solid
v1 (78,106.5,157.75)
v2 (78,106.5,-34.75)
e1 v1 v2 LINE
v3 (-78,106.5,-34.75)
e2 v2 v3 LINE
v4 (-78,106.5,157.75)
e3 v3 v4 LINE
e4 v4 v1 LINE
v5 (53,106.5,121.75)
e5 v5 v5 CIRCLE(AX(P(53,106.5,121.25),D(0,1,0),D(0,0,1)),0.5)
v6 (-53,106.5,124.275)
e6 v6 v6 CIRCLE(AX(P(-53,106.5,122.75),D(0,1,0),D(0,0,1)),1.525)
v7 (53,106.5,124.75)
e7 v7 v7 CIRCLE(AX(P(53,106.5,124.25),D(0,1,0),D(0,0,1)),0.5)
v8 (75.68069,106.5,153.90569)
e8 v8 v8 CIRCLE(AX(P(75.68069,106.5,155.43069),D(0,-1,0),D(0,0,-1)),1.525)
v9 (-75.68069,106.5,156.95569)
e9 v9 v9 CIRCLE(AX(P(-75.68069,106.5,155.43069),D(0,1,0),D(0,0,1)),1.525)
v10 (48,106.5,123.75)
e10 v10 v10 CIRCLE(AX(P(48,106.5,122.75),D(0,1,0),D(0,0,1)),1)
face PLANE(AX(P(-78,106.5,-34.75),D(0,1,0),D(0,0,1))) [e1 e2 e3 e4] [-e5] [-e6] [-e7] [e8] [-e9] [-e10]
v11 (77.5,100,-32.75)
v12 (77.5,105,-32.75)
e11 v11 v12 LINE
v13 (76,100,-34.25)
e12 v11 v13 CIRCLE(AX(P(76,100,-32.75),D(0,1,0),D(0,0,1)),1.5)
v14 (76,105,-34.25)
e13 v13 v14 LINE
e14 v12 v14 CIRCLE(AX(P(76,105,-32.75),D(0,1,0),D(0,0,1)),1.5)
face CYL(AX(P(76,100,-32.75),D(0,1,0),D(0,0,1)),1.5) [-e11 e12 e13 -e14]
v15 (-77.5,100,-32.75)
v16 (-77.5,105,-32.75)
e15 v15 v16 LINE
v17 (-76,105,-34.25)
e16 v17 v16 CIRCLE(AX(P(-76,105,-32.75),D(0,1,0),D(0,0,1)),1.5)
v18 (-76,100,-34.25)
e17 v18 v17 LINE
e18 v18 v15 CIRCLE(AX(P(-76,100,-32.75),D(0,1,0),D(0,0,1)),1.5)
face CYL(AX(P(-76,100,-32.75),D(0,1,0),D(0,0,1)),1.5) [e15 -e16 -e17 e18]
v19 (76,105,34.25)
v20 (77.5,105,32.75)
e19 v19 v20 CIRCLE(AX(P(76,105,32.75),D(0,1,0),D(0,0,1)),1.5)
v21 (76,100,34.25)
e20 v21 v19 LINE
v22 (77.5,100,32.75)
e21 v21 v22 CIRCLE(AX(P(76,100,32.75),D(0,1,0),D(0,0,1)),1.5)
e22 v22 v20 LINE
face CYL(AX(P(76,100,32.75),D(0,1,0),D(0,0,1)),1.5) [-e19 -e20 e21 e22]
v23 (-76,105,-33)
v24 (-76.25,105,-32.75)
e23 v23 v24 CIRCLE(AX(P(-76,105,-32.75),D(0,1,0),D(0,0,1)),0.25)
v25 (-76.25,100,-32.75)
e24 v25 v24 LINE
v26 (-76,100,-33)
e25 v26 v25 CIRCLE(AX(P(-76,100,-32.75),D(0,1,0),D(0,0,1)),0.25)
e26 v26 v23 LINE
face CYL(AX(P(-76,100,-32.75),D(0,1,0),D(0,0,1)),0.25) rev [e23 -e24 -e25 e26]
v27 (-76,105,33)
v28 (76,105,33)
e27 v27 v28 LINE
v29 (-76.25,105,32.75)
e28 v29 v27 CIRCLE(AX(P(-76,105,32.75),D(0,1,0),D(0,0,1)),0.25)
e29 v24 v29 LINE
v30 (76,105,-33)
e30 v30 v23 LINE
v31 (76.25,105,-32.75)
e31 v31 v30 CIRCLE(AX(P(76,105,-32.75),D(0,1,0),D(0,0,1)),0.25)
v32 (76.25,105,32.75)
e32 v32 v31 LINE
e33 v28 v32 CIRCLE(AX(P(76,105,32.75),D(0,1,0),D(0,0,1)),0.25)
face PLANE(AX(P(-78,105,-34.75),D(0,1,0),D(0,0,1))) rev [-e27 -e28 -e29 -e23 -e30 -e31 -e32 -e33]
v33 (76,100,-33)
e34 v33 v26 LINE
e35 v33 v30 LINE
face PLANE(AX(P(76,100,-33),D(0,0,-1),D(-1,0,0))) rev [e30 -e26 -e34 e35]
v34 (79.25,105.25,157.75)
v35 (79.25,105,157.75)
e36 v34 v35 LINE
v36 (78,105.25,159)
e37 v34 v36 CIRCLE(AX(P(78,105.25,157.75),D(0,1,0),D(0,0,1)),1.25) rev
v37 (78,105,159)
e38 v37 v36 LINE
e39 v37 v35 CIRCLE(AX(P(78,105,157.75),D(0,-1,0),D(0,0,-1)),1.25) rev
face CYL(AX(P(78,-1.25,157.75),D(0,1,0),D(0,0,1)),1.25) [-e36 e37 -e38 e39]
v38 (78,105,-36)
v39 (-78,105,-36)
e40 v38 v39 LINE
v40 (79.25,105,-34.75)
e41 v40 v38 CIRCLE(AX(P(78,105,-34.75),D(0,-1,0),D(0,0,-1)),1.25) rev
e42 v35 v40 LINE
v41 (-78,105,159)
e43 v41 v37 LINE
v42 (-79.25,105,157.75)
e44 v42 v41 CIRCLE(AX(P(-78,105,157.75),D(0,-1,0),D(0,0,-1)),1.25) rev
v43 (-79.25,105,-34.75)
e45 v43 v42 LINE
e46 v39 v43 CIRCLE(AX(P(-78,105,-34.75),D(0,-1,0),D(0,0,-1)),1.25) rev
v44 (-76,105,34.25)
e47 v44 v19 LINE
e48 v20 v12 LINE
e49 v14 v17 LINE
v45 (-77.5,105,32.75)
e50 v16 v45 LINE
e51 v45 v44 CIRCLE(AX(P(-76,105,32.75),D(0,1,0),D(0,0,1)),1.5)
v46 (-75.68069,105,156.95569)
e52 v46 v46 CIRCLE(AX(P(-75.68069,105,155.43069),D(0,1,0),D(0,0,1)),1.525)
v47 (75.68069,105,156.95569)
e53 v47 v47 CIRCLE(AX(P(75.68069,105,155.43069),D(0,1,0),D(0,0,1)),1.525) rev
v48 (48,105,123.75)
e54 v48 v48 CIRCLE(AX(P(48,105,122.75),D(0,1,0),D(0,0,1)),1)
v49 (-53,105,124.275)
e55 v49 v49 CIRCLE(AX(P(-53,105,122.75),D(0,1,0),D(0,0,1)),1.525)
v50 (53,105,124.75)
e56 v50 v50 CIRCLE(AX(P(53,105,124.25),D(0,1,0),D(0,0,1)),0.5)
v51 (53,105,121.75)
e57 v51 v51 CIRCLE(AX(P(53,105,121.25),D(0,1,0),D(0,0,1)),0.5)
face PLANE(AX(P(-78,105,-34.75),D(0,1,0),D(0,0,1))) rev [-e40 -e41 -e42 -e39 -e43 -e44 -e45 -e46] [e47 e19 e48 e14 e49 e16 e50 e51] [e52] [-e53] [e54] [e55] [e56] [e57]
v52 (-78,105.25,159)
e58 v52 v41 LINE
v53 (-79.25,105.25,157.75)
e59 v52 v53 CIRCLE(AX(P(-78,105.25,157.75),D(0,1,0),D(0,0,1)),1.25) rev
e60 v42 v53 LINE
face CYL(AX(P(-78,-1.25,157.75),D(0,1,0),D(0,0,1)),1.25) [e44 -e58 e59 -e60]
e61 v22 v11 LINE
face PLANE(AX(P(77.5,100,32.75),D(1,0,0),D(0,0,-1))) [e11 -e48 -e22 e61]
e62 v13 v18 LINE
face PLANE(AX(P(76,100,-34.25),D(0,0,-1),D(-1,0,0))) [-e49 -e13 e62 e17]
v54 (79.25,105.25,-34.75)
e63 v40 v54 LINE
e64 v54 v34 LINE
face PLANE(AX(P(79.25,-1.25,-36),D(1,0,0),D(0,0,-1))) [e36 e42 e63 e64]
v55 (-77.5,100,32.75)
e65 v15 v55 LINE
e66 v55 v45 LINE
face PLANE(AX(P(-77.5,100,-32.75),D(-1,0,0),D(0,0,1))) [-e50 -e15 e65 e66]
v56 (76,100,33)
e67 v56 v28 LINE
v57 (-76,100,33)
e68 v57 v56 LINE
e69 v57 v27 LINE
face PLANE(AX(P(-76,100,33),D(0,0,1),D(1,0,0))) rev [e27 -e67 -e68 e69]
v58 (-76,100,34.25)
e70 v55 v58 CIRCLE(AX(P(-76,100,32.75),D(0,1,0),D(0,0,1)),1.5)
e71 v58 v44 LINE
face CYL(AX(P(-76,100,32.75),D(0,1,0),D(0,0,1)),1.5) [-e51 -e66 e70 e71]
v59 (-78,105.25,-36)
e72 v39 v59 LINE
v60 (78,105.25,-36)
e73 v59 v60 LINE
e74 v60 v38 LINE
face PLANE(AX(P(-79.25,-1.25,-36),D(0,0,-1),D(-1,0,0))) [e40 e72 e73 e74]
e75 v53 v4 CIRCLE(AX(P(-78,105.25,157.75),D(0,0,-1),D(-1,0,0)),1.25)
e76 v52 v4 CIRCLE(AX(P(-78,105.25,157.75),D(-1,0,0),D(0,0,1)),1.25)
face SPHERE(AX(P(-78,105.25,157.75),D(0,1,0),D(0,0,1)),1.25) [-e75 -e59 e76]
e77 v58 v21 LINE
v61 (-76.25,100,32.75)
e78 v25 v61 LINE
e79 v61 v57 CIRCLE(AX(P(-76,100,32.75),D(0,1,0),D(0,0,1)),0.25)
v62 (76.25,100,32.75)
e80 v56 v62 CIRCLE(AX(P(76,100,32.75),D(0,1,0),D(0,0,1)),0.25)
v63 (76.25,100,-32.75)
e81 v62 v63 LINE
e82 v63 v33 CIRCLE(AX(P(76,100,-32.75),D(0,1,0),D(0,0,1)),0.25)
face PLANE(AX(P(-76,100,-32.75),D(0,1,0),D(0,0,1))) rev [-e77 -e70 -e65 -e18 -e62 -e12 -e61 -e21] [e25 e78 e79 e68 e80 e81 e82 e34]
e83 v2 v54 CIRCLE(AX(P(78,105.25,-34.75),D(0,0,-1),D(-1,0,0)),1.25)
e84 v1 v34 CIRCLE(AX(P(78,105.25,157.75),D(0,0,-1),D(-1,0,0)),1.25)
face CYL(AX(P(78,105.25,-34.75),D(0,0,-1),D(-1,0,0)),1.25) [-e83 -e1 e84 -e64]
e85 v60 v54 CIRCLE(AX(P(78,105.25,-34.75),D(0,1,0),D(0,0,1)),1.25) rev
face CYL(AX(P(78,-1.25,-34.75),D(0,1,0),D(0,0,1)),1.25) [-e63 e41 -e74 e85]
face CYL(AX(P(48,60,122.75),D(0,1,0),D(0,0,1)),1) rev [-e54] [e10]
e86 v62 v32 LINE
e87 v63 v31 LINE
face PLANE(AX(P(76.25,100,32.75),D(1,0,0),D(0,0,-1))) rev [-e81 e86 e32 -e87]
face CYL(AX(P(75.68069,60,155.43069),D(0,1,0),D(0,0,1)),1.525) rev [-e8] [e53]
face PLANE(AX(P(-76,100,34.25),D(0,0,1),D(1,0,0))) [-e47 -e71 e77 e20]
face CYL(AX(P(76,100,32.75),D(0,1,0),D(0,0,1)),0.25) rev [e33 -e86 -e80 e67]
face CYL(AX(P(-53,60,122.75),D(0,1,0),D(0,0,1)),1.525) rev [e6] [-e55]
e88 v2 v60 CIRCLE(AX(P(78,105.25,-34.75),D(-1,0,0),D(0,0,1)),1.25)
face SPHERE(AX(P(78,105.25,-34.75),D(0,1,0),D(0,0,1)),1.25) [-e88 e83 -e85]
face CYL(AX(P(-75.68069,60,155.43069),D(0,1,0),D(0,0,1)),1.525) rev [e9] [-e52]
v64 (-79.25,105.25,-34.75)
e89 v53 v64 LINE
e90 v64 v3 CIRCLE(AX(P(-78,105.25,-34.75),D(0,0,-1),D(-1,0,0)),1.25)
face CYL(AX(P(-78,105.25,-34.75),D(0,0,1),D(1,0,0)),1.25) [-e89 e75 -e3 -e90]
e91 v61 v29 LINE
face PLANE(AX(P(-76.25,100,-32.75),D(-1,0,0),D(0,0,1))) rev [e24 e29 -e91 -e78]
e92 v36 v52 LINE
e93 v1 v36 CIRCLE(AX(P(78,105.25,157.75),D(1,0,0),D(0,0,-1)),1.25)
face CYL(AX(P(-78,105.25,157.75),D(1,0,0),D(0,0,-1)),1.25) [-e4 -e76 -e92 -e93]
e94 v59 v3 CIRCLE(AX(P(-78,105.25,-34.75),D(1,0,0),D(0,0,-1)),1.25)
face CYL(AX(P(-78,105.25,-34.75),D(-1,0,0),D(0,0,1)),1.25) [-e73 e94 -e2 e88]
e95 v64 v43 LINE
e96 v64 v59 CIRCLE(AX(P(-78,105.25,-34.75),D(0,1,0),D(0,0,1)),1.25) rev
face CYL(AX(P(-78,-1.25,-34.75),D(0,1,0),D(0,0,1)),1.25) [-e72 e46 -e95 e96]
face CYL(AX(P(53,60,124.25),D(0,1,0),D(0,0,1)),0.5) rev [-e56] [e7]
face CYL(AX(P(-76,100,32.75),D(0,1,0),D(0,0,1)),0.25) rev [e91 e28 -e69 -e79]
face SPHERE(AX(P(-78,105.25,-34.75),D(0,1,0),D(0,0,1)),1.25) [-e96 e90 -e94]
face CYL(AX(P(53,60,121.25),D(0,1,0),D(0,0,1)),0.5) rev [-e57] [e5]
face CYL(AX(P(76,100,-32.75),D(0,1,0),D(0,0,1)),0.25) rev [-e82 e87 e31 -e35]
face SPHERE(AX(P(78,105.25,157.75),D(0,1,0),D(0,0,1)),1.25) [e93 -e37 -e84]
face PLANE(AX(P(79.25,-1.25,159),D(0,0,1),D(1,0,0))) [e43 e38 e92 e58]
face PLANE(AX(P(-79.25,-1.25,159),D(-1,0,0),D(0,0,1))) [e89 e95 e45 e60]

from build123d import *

# Parameters (mm, degrees)
BOSS_EXTRUDE1_DEPTH      = 1.25
SKETCH1_W                = 156
SKETCH1_H                = 69.5
BOSS_EXTRUDE2_DEPTH      = 105
SKETCH4_R                = 2.5000000000000027
BOSS_EXTRUDE3_DEPTH      = 8
FILLET2_R                = 2
SKETCH5_R                = 1.5499999999999998
SKETCH5_R_2              = 1.5500000000000012
CUT_EXTRUDE1_DEPTH       = 8
SKETCH6_R                = 8.25
CUT_EXTRUDE2_DEPTH       = 8
SKETCH8_R                = 3.750000000000007
SKETCH8_R_2              = 3.0000000000000084
SKETCH8_W                = 7.000000000000014
SKETCH8_H                = 14
CUT_EXTRUDE3_DEPTH       = 8
FILLET3_R                = 1.25
FILLET4_R                = 1.25
SKETCH11_R               = 1.5499999999999932
CUT_EXTRUDE4_DEPTH       = 8
BOSS_EXTRUDE5_REACH      = 209.004
FILLET5_R                = 1.25
SKETCH14_R               = 1.5249999999999995
CUT_EXTRUDE5_DEPTH       = 8
BOSS_EXTRUDE6_DEPTH      = 5
CUT_EXTRUDE10_DEPTH      = 176.50000000000017
CUT_EXTRUDE10_DEPTH_BACK = 9
SKETCH19_R               = 1.5249999999999995
BOSS_EXTRUDE7_DEPTH      = 1.5
SKETCH17_W               = 214.39373035957487
SKETCH17_H               = 311.75060194691184
CUT_EXTRUDE6_DEPTH       = 142.50000000000003
SKETCH18_W               = 843.8612520819788
SKETCH18_H               = 210.19069540658822
CUT_EXTRUDE7_DEPTH       = 211.50000000000009
FILLET6_R                = 1.25
SKETCH21_R               = 1.5249999999999995
CUT_EXTRUDE11_DEPTH      = 46.50000000000004
SKETCH22_R               = 1.5249999999999952
SKETCH22_R_2             = 0.49999999999999917
SKETCH22_R_3             = 0.9999999999999983
CUT_EXTRUDE12_DEPTH      = 46.50000000000004


with BuildPart() as part:
    # Sketch2 → Boss-Extrude1 (new body)
    with BuildSketch(Plane(origin=(0, 0, 0), x_dir=(1, 0, 0), z_dir=(0, 1, 0))):
        Polygon((-79.25000000000004, 35.99999999999998), (79.24999999999996, 35.99999999999999), (79.24999999999999, -159.00000000000003), (-79.25000000000001, -159.00000000000003), align=None)
    extrude(amount=-BOSS_EXTRUDE1_DEPTH)

    # Sketch1 → Boss-Extrude2 (add)
    with BuildSketch(Plane(origin=(0, 0, 0), x_dir=(1, 0, 0), z_dir=(0, 1, 0))):
        Polygon((79.24999999999999, -159.00000000000003), (-79.25000000000001, -159.00000000000003), (-79.25000000000004, -86.00000000000001), (-79.25000000000004, -36.00000000000002), (-79.25000000000004, 35.99999999999998), (79.24999999999996, 35.99999999999999), (79.24999999999996, -36.00000000000002), (79.24999999999996, -86.00000000000001), align=None)
        Polygon((-78.00000000000001, -157.75000000000006), (77.99999999999999, -157.75000000000006), (77.99999999999996, -86.00000000000001), (77.99999999999996, -36.00000000000002), (-78.00000000000004, -36.00000000000002), (-78.00000000000004, -86.00000000000001), (-78.00000000000004, -100.58859756900745), align=None, mode=Mode.SUBTRACT)
        Rectangle(SKETCH1_W, SKETCH1_H, mode=Mode.SUBTRACT)
    extrude(amount=BOSS_EXTRUDE2_DEPTH)

    # Sketch4 → Boss-Extrude3 (add)
    with BuildSketch(Plane(origin=(0, 0, 0), x_dir=(1, 0, 0), z_dir=(0, 1, 0))):
        with Locations(Location((-37.074999999999996, -117.75000000000004, 0), (0, 0, 90))):
            Circle(SKETCH4_R)
        with Locations(Location((37.074999999999996, -117.75000000000003, 0), (0, 0, 90))):
            Circle(SKETCH4_R)
    extrude(amount=BOSS_EXTRUDE3_DEPTH)

    # Fillet2
    fillet2_edges = [part.edges().sort_by_distance(p)[0] for p in [
        (77.99999999999996, 52.5, -34.749999999999986),
        (77.99999999999996, 52.5, 34.750000000000014),
        (-78.00000000000004, 0, 1.421e-14),
        (-78.00000000000004, 52.5, 34.750000000000014),
        (77.99999999999999, 52.5, 157.75000000000006),
        (-78.00000000000001, 52.5, 157.75000000000006),
        (-4.263e-14, 0, 36.00000000000002),
        (-78.00000000000004, 52.5, 36.00000000000002),
        (77.99999999999997, 0, 96.87500000000003),
        (77.99999999999996, 52.5, 36.00000000000002),
        (-4.263e-14, 0, -34.749999999999986),
        (-78.00000000000004, 52.5, -34.749999999999986),
        (-1.421e-14, 0, 157.75000000000006),
        (-78.00000000000003, 0, 96.87500000000004),
        (77.99999999999996, 0, 1.421e-14),
        (-4.263e-14, 0, 34.750000000000014),
        (-37.074999999999996, 0, 120.25000000000004),
        (37.074999999999996, 0, 120.25000000000003),
    ]]
    fillet(fillet2_edges, radius=FILLET2_R)

    # Sketch5 → Cut-Extrude1 (cut)
    with BuildSketch(Plane.XY.offset(36.00000000000002)):
        with BuildLine():
            ThreePointArc((-53.750000000000085, 99.54999999999998), (-54.84601551083924, 99.09601551083914), (-55.30000000000008, 97.99999999999999))
            Line((-55.30000000000008, 97.99999999999999), (-53.750000000000085, 97.99999999999999))
            Line((-53.750000000000085, 97.99999999999999), (-53.750000000000085, 99.54999999999998))
        make_face()
        with BuildLine():
            Line((-53.750000000000085, 97.99999999999999), (-55.30000000000008, 97.99999999999999))
            ThreePointArc((-55.30000000000008, 97.99999999999999), (-53.750000000000085, 96.44999999999999), (-52.20000000000009, 97.99999999999999))
            ThreePointArc((-52.20000000000009, 97.99999999999999), (-52.65398448916093, 99.09601551083914), (-53.750000000000085, 99.54999999999998))
            Line((-53.750000000000085, 99.54999999999998), (-53.750000000000085, 97.99999999999999))
        make_face()
        with Locations((53.750000000000206, 97.99999999999967)):
            Circle(SKETCH5_R)
        with Locations((-53.750000000000085, 7.999999999999743)):
            Circle(SKETCH5_R_2)
        with Locations((53.749999999999666, 7.9999999999994245)):
            Circle(SKETCH5_R_2)
    extrude(amount=-CUT_EXTRUDE1_DEPTH, mode=Mode.SUBTRACT)

    # Sketch6 → Cut-Extrude2 (cut)
    with BuildSketch(Plane(origin=(0, 0, 157.75000000000006), x_dir=(-1, 0, 0), z_dir=(0, 0, -1))):
        with Locations((0, 22)):
            Circle(SKETCH6_R)
    extrude(amount=-CUT_EXTRUDE2_DEPTH, mode=Mode.SUBTRACT)

    # Sketch8 → Cut-Extrude3 (cut)
    with BuildSketch(Plane.ZY.offset(79.25000000000004)):
        with Locations((131.5, 54.99999999999998)):
            Circle(SKETCH8_R)
        with Locations((101.50000000000001, 54.99999999999998)):
            Circle(SKETCH8_R_2)
        with Locations((116.50000000000003, 64.99999999999999)):
            Rectangle(SKETCH8_W, SKETCH8_H)
        with Locations((101.50000000000001, 64.99999999999997)):
            Circle(SKETCH8_R_2)
        with Locations((101.50000000000001, 74.99999999999997)):
            Circle(SKETCH8_R_2)
        with Locations((101.50000000000001, 84.99999999999997)):
            Circle(SKETCH8_R_2)
        with Locations((131.5, 74.99999999999999)):
            Circle(SKETCH8_R)
    extrude(amount=-CUT_EXTRUDE3_DEPTH, mode=Mode.SUBTRACT)

    # Fillet3
    fillet3_edges = [part.edges().sort_by_distance(p)[0] for p in [
        (79.24999999999997, -1.25, 61.50000000000002),
        (-4.263e-14, -1.25, -35.999999999999986),
        (-79.25000000000003, -1.25, 61.50000000000003),
        (-1.421e-14, -1.25, 159.00000000000003),
    ]]
    fillet(fillet3_edges, radius=FILLET3_R)

    # Fillet4
    # the kernel refuses this fillet: 1.25 mm, written as the material it takes off along each edge
    with BuildSketch(Plane(origin=(-78.00000000000004, 0, -34.74999999999997), x_dir=(-9e-17, 0, -1), z_dir=(-1, 0, 1.5e-16))) as fillet4_piece_1_section:
        Polygon((0, 0), (FILLET4_R, 0), (FILLET4_R, FILLET4_R), (0, FILLET4_R), align=None)
    fillet4_piece_1 = extrude(amount=FILLET4_R, mode=Mode.PRIVATE)
    fillet4_piece_1 = fillet4_piece_1 - Plane(origin=(-78.00000000000004, 0, -34.74999999999997), x_dir=(0, 0.7071067811865475, 0.7071067811865475), z_dir=(-1, 0, 1.5e-16)) * Sphere(FILLET4_R, mode=Mode.PRIVATE)
    add(fillet4_piece_1, mode=Mode.SUBTRACT)
    with BuildSketch(Plane(origin=(77.99999999999996, 0, -34.74999999999999), x_dir=(-9e-17, 0, -1), z_dir=(1, 0, -1.5e-16))) as fillet4_piece_2_section:
        Polygon((0, 0), (FILLET4_R, 0), (FILLET4_R, -FILLET4_R), (0, -FILLET4_R), align=None)
    fillet4_piece_2 = extrude(amount=FILLET4_R, mode=Mode.PRIVATE)
    fillet4_piece_2 = fillet4_piece_2 - Plane(origin=(77.99999999999996, 0, -34.74999999999999), x_dir=(0, 0.7071067811865475, 0.7071067811865475), z_dir=(1, 0, -1.5e-16)) * Sphere(FILLET4_R, mode=Mode.PRIVATE)
    add(fillet4_piece_2, mode=Mode.SUBTRACT)
    with BuildSketch(Plane(origin=(-78.00000000000001, 0, 157.75000000000003), x_dir=(-1, 0, 1.5e-16), z_dir=(0, 0, 1))) as fillet4_piece_3_section:
        Polygon((0, 0), (FILLET4_R, 0), (FILLET4_R, FILLET4_R), (0, FILLET4_R), align=None)
    fillet4_piece_3 = extrude(amount=FILLET4_R, mode=Mode.PRIVATE)
    fillet4_piece_3 = fillet4_piece_3 - Plane(origin=(-78.00000000000001, 0, 157.75000000000003), x_dir=(0.7071067811865475, 0.7071067811865475, 0), z_dir=(0, 0, 1)) * Sphere(FILLET4_R, mode=Mode.PRIVATE)
    add(fillet4_piece_3, mode=Mode.SUBTRACT)
    with BuildSketch(Plane(origin=(77.99999999999999, 0, 157.75000000000003), x_dir=(1, 0, -1.5e-16), z_dir=(0, 0, 1))) as fillet4_piece_4_section:
        Polygon((0, 0), (FILLET4_R, 0), (FILLET4_R, -FILLET4_R), (0, -FILLET4_R), align=None)
    fillet4_piece_4 = extrude(amount=FILLET4_R, mode=Mode.PRIVATE)
    fillet4_piece_4 = fillet4_piece_4 - Plane(origin=(77.99999999999999, 0, 157.75000000000003), x_dir=(-0.7071067811865475, 0.7071067811865475, 0), z_dir=(0, 0, 1)) * Sphere(FILLET4_R, mode=Mode.PRIVATE)
    add(fillet4_piece_4, mode=Mode.SUBTRACT)
    with BuildSketch(Plane(origin=(79.24999999999999, 108.12500000000007, 159.00000000000003), x_dir=(-1, 0, 0), z_dir=(0, -1, 0))) as fillet4_piece_5:
        with BuildLine():
            CenterArc((FILLET4_R, FILLET4_R), FILLET4_R, 179.9999999999987, 90.00000000000131)
            Line((0, FILLET4_R), (0, 0))
            Line((0, 0), (FILLET4_R, 0))
        make_face()
    extrude(amount=108.12500000000007, mode=Mode.SUBTRACT)
    with BuildSketch(Plane(origin=(-79.25000000000001, -2.2e-16, 159.00000000000003), x_dir=(1, 0, 0), z_dir=(0, 1, 0))) as fillet4_piece_6:
        with BuildLine():
            CenterArc((FILLET4_R, FILLET4_R), FILLET4_R, 180, 90)
            Line((0, FILLET4_R), (0, 0))
            Line((0, 0), (FILLET4_R, 0))
        make_face()
    extrude(amount=108.12499999999999, mode=Mode.SUBTRACT)
    with BuildSketch(Plane(origin=(79.24999999999996, 108.125, -35.99999999999999), x_dir=(0, 0, 1), z_dir=(0, -1, 0))) as fillet4_piece_7:
        with BuildLine():
            CenterArc((FILLET4_R, FILLET4_R), FILLET4_R, 180, 90)
            Line((0, FILLET4_R), (0, 0))
            Line((0, 0), (FILLET4_R, 0))
        make_face()
    extrude(amount=108.125, mode=Mode.SUBTRACT)
    with BuildSketch(Plane(origin=(-79.25000000000004, -2.2e-16, -35.99999999999998), x_dir=(0, 0, 1), z_dir=(0, 1, 0))) as fillet4_piece_8:
        with BuildLine():
            CenterArc((FILLET4_R, FILLET4_R), FILLET4_R, 180, 90)
            Line((-2.132e-14, FILLET4_R), (0, 0))
            Line((0, 0), (FILLET4_R, 0))
        make_face()
    extrude(amount=108.12499999999999, mode=Mode.SUBTRACT)

    # Sketch11 → Cut-Extrude4 (cut)
    with BuildSketch(Plane(origin=(79.24999999999996, 0, -1.128e-14), x_dir=(-1.4e-16, 0, -1), z_dir=(1, 0, -1.4e-16))):
        with BuildLine():
            ThreePointArc((-13.05000000000001, 102.49999999999999), (-12.596015510839159, 101.40398448916083), (-11.50000000000001, 100.94999999999999))
            Line((-11.50000000000001, 100.94999999999999), (-11.50000000000001, 102.49999999999999))
            Line((-11.500000000000014, 102.49999999999999), (-13.050000000000011, 102.49999999999999))
        make_face()
        with BuildLine():
            Line((-11.50000000000001, 102.49999999999999), (-11.50000000000001, 100.94999999999999))
            ThreePointArc((-11.50000000000001, 100.94999999999999), (-10.403984489160864, 101.40398448916083), (-9.950000000000012, 102.49999999999999))
            ThreePointArc((-9.950000000000012, 102.49999999999999), (-11.50000000000001, 104.04999999999998), (-13.05000000000001, 102.49999999999999))
            Line((-13.050000000000011, 102.49999999999999), (-11.500000000000014, 102.49999999999999))
        make_face()
        with BuildLine():
            ThreePointArc((-25.550000000000008, 90), (-25.096015510839155, 88.90398448916085), (-24.000000000000007, 88.45))
            Line((-24.000000000000007, 88.45000000000002), (-24.000000000000007, 90))
            Line((-24, 90), (-25.55000000000001, 90))
        make_face()
        with BuildLine():
            Line((-24.000000000000007, 90), (-24.000000000000007, 88.45000000000002))
            ThreePointArc((-24.000000000000007, 88.45), (-22.90398448916086, 88.90398448916085), (-22.450000000000006, 90))
            ThreePointArc((-22.450000000000006, 90), (-24.000000000000007, 91.55), (-25.550000000000008, 90))
            Line((-25.55000000000001, 90), (-24, 90))
        make_face()
        with BuildLine():
            ThreePointArc((-9.949999999999998, 2.4999999999999742), (-10.403984489160848, 3.5960155108391216), (-11.499999999999995, 4.049999999999974))
            Line((-11.499999999999996, 4.049999999999969), (-11.499999999999996, 2.4999999999999716))
            Line((-11.5, 2.4999999999999742), (-13.049999999999997, 2.4999999999999742))
            ThreePointArc((-13.049999999999995, 2.4999999999999742), (-11.499999999999996, 0.9499999999999749), (-9.949999999999998, 2.499999999999974))
        make_face()
        with BuildLine():
            Line((-11.499999999999996, 2.4999999999999716), (-11.499999999999996, 4.049999999999969))
            ThreePointArc((-11.499999999999995, 4.049999999999974), (-12.596015510839145, 3.596015510839123), (-13.049999999999995, 2.4999999999999742))
            Line((-13.049999999999997, 2.4999999999999742), (-11.5, 2.4999999999999742))
        make_face()
        with BuildLine():
            ThreePointArc((-111.5, 4.049999999999969), (-112.59601551083915, 1.40398448916083), (-109.95, 2.499999999999974))
            Line((-109.95, 2.4999999999999742), (-111.5, 2.4999999999999742))
            Line((-111.5, 2.4999999999999716), (-111.5, 4.049999999999969))
        make_face()
        with BuildLine():
            Line((-111.5, 2.4999999999999742), (-109.95, 2.4999999999999742))
            ThreePointArc((-109.95, 2.4999999999999742), (-110.40398448916086, 3.5960155108391185), (-111.5, 4.049999999999969))
            Line((-111.5, 4.049999999999969), (-111.5, 2.4999999999999716))
        make_face()
        with BuildLine():
            ThreePointArc((-97.45, 14.999999999999993), (-97.90398448916086, 16.096015510839138), (-99, 16.549999999999986))
            Line((-99, 16.549999999999986), (-99, 14.999999999999993))
            Line((-99, 14.999999999999993), (-97.45, 14.999999999999993))
        make_face()
        with BuildLine():
            Line((-99, 14.999999999999993), (-99, 16.549999999999986))
            ThreePointArc((-99, 16.549999999999986), (-100.09601551083915, 13.903984489160848), (-97.45, 14.999999999999993))
            Line((-97.45, 14.999999999999993), (-99, 14.999999999999993))
        make_face()
        with BuildLine():
            ThreePointArc((-22.450000000000006, 14.999999999999993), (-22.90398448916086, 16.09601551083914), (-24.000000000000007, 16.549999999999994))
            Line((-24.000000000000007, 16.549999999999994), (-24.000000000000007, 14.999999999999993))
            Line((-24, 14.999999999999993), (-25.55000000000001, 14.999999999999993))
            ThreePointArc((-25.550000000000008, 14.999999999999993), (-24.000000000000007, 13.449999999999992), (-22.450000000000006, 14.999999999999993))
        make_face()
        with BuildLine():
            Line((-24.000000000000007, 14.999999999999993), (-24.000000000000007, 16.549999999999994))
            ThreePointArc((-24.000000000000007, 16.549999999999994), (-25.096015510839155, 16.09601551083914), (-25.550000000000008, 14.999999999999993))
            Line((-25.55000000000001, 14.999999999999993), (-24, 14.999999999999993))
        make_face()
        with Locations((-111.50000000000001, 102.49999999999999)):
            Circle(SKETCH11_R)
        with Locations((-99, 90)):
            Circle(SKETCH11_R)
    extrude(amount=-CUT_EXTRUDE4_DEPTH, mode=Mode.SUBTRACT)

    # Boss-Extrude5: up to this face of the body (flat: up to its plane)
    boss_extrude5_end = Plane(part.part.faces().sort_by_distance((0, 0, 96.725539908))[0])
    # Sketch12 → Boss-Extrude5 (add, up to the picked face)
    with BuildSketch(Plane(origin=(0, 105, 0), x_dir=(1, 0, 0), z_dir=(0, 1, 0)), mode=Mode.PRIVATE) as boss_extrude5_sk1:
        with BuildLine():
            Line((73, -152.75000000000043), (72.99999999999997, -157.75000000000043))
            Line((72.99999999999997, -157.75000000000043), (75.99999999999996, -157.75000000000045))
            ThreePointArc((75.99999999999996, -157.75000000000006), (77.41421356237305, -157.16421356237316), (77.99999999999994, -155.75000000000006))
            Line((77.99999999999999, -155.75000000000006), (78, -152.75000000000045))
            Line((78, -152.75000000000045), (73, -152.75000000000043))
        make_face()
    boss_extrude5_tool1 = split(extrude(boss_extrude5_sk1.sketch, amount=-BOSS_EXTRUDE5_REACH, mode=Mode.PRIVATE), bisect_by=boss_extrude5_end, keep=Keep.BOTH, mode=Mode.PRIVATE)
    # Sketch12 → Boss-Extrude5 (add, up to the picked face)
    with BuildSketch(Plane(origin=(0, 105, 0), x_dir=(1, 0, 0), z_dir=(0, 1, 0)), mode=Mode.PRIVATE) as boss_extrude5_sk2:
        with BuildLine():
            ThreePointArc((-78.00000000000003, -155.75000000000006), (-77.41421356237313, -157.16421356237316), (-76.00000000000003, -157.75000000000006))
            Line((-76.00000000000003, -157.75000000000006), (-73.00000000000003, -157.75000000000006))
            Line((-73.00000000000003, -157.75000000000006), (-73.00000000000003, -152.75000000000006))
            Line((-73.00000000000003, -152.75000000000006), (-78.00000000000003, -152.75000000000006))
            Line((-78.00000000000003, -152.75000000000006), (-78.00000000000003, -155.75000000000006))
        make_face()
    boss_extrude5_tool2 = split(extrude(boss_extrude5_sk2.sketch, amount=-BOSS_EXTRUDE5_REACH, mode=Mode.PRIVATE), bisect_by=boss_extrude5_end, keep=Keep.BOTH, mode=Mode.PRIVATE)
    add(boss_extrude5_tool1.solids().sort_by(Axis((75.426992, 105, 155.176992), (0, -1, 0)))[0])
    add(boss_extrude5_tool2.solids().sort_by(Axis((-75.426992, 105, 155.176992), (0, -1, 0)))[0])

    # Fillet5
    fillet5_edges = [part.edges().sort_by_distance(p)[0] for p in [
        (77.41421356237306, 0.5857864376269042, 152.75000000000043),
        (72.99999999999999, 0.5857864376269046, 157.16421356237316),
        (72.99999999999997, 53.5, 157.75000000000043),
        (74.49999999999999, 0, 152.75000000000043),
        (73, 52.5, 152.75000000000043),
        (78, 53.5, 152.75000000000045),
        (73, 0, 154.25000000000023),
        (-77.41421356237313, 0.5857864376269042, 152.75000000000006),
        (-73.00000000000003, 0, 154.25000000000006),
        (-73.00000000000003, 52.5, 152.75000000000006),
        (-78.00000000000003, 53.5, 152.75000000000006),
        (-74.50000000000003, 0, 152.75000000000006),
        (-73.00000000000003, 0.5857864376269046, 157.16421356237316),
        (-73.00000000000003, 53.5, 157.75000000000006),
    ]]
    fillet(fillet5_edges, radius=FILLET5_R)

    # Sketch14 → Cut-Extrude5 (cut)
    with BuildSketch(Plane(origin=(0, 105, 0), x_dir=(1, 0, 0), z_dir=(0, 1, 0))):
        with Locations(Location((75.68305826175839, -155.43305826175865, 0), (0, 0, 270))):
            Circle(SKETCH14_R)
        with Locations(Location((-75.68305826175845, -155.43305826175828, 0), (0, 0, 270))):
            Circle(SKETCH14_R)
    extrude(amount=-CUT_EXTRUDE5_DEPTH, mode=Mode.SUBTRACT)

    # Sketch19 → Cut-Extrude10 (cut, two sides: drawn at the far end of the back side and taken through both)
    with BuildSketch(Plane(origin=(0, 105, 0), x_dir=(1, 0, 0), z_dir=(0, 1, 0)).offset(-CUT_EXTRUDE10_DEPTH_BACK)):
        with Locations(Location((75.68305826175839, -155.43305826175865, 0), (0, 0, 270))):
            Circle(SKETCH19_R)
        with Locations(Location((-75.68305826175845, -155.43305826175828, 0), (0, 0, 270))):
            Circle(SKETCH19_R)
    extrude(amount=CUT_EXTRUDE10_DEPTH + CUT_EXTRUDE10_DEPTH_BACK, mode=Mode.SUBTRACT)



with BuildPart() as body_2:
    # Sketch15 → Boss-Extrude6 (new body)
    with BuildSketch(Plane(origin=(0, 105, 0), x_dir=(1, 0, 0), z_dir=(0, 1, 0))):
        with BuildLine():
            Line((-77.50000000000004, 32.749999999999986), (-77.50000000000004, -32.750000000000014))
            ThreePointArc((-77.50000000000004, -32.750000000000014), (-77.06066017177986, -33.81066017177984), (-76.00000000000004, -34.250000000000014))
            Line((-76.00000000000004, -34.250000000000014), (75.99999999999996, -34.250000000000014))
            ThreePointArc((75.99999999999996, -34.250000000000014), (77.06066017177977, -33.81066017177984), (77.49999999999996, -32.750000000000014))
            Line((77.49999999999996, -32.750000000000014), (77.49999999999996, 32.749999999999986))
            ThreePointArc((77.49999999999996, 32.749999999999986), (77.06066017177977, 33.81066017177981), (75.99999999999996, 34.249999999999986))
            Line((75.99999999999996, 34.249999999999986), (-76.00000000000004, 34.249999999999986))
            ThreePointArc((-76.00000000000004, 34.249999999999986), (-77.06066017177986, 33.81066017177981), (-77.50000000000004, 32.749999999999986))
        make_face()
        with BuildLine():
            Line((75.99999999999996, 32.999999999999986), (-76.00000000000004, 32.999999999999986))
            ThreePointArc((-76.00000000000004, 32.999999999999986), (-76.17677669529668, 32.926776695296624), (-76.25000000000004, 32.749999999999986))
            Line((-76.25000000000004, 32.749999999999986), (-76.25000000000004, -32.750000000000014))
            ThreePointArc((-76.25000000000004, -32.750000000000014), (-76.17677669529668, -32.92677669529665), (-76.00000000000004, -33.000000000000014))
            Line((-76.00000000000004, -33.000000000000014), (75.99999999999996, -33.000000000000014))
            ThreePointArc((75.99999999999996, -33.000000000000014), (76.1767766952966, -32.92677669529665), (76.24999999999996, -32.750000000000014))
            Line((76.24999999999996, -32.750000000000014), (76.24999999999996, 32.749999999999986))
            ThreePointArc((76.24999999999996, 32.749999999999986), (76.1767766952966, 32.926776695296624), (75.99999999999996, 32.999999999999986))
        make_face(mode=Mode.SUBTRACT)
    extrude(amount=-BOSS_EXTRUDE6_DEPTH)


with BuildPart() as part_1:
    add(part.part)

    add(body_2.part)  # Boss-Extrude7 merges body 2
    # Sketch16 → Boss-Extrude7 (add)
    with BuildSketch(Plane(origin=(0, 105, 0), x_dir=(1, 0, 0), z_dir=(0, 1, 0))):
        with BuildLine():
            Line((-79.25000000000004, 34.74999999999998), (-79.25000000000004, -157.75000000000003))
            ThreePointArc((-79.25000000000004, -157.75000000000003), (-78.88388347648322, -158.63388347648322), (-78.00000000000001, -159.00000000000003))
            Line((-78.00000000000001, -159.00000000000003), (77.99999999999999, -159.00000000000003))
            ThreePointArc((77.99999999999999, -159.00000000000003), (78.88388347648316, -158.63388347648322), (79.24999999999999, -157.75000000000003))
            Line((79.24999999999999, -157.75000000000003), (79.24999999999991, 34.749999999999986))
            ThreePointArc((79.24999999999991, 34.749999999999986), (78.8838834764831, 35.63388347648314), (77.99999999999996, 35.99999999999997))
            Line((77.99999999999996, 35.99999999999997), (-78.00000000000004, 35.99999999999998))
            ThreePointArc((-78.00000000000004, 35.99999999999998), (-78.88388347648322, 35.63388347648316), (-79.25000000000004, 34.74999999999998))
        make_face()
    extrude(amount=BOSS_EXTRUDE7_DEPTH)

    # Sketch17 → Cut-Extrude6 (cut)
    with BuildSketch(Plane.XZ.offset(-105)):
        with Locations((-9.695908791144348, 54.3605461890202)):
            Rectangle(SKETCH17_W, SKETCH17_H)
        with BuildLine():
            Line((77.99999999999996, -32.749999999999986), (77.99999999999996, 32.750000000000014))
            ThreePointArc((77.99999999999996, 32.750000000000014), (77.41421356237305, 34.16421356237311), (75.99999999999996, 34.750000000000014))
            Line((75.99999999999996, 34.750000000000014), (-76.00000000000004, 34.750000000000014))
            ThreePointArc((-76.00000000000004, 34.750000000000014), (-77.41421356237313, 34.16421356237311), (-78.00000000000004, 32.750000000000014))
            Line((-78.00000000000004, 32.750000000000014), (-78.00000000000004, -32.749999999999986))
            ThreePointArc((-78.00000000000004, -32.749999999999986), (-77.41421356237313, -34.16421356237308), (-76.00000000000004, -34.749999999999986))
            Line((-76.00000000000004, -34.749999999999986), (75.99999999999996, -34.749999999999986))
            ThreePointArc((75.99999999999996, -34.749999999999986), (77.41421356237305, -34.16421356237308), (77.99999999999996, -32.749999999999986))
        make_face(mode=Mode.SUBTRACT)
    extrude(amount=CUT_EXTRUDE6_DEPTH, mode=Mode.SUBTRACT)


with BuildPart() as cut_extrude6_piece_1:
    # of the separate pieces the step leaves, piece 1, a body of its own (cut_extrude6_pieces)
    add(part_1.part.solids().sort_by_distance((-76, 105, -34.25))[0])

    # Fillet6
    fillet6_edges = [cut_extrude6_piece_1.edges().sort_by_distance(p)[0] for p in [
        (-78.88388347648322, 106.5, -35.633883476483156),
        (-79.25000000000004, 106.5, 61.50000000000002),
        (-78.88388347648322, 106.5, 158.63388347648322),
        (-1.421e-14, 106.5, 159.00000000000003),
        (78.88388347648318, 106.5, 158.63388347648322),
        (79.24999999999994, 106.5, 61.50000000000003),
        (78.8838834764831, 106.5, -35.63388347648314),
        (-4.263e-14, 106.5, -35.99999999999997),
    ]]
    fillet(fillet6_edges, radius=FILLET6_R)

    # Sketch21 → Cut-Extrude11 (cut)
    with BuildSketch(Plane(origin=(0, 106.5, 0), x_dir=(1, 0, 0), z_dir=(0, 1, 0))):
        with Locations(Location((-75.68068975770814, -155.43068975770817, 0), (0, 0, 270))):
            Circle(SKETCH21_R)
        with Locations(Location((75.68068975770811, -155.43068975770834, 0), (0, 0, 270))):
            Circle(SKETCH21_R)
    extrude(amount=-CUT_EXTRUDE11_DEPTH, mode=Mode.SUBTRACT)

    # Sketch22 → Cut-Extrude12 (cut)
    with BuildSketch(Plane(origin=(0, 106.5, 0), x_dir=(1, 0, 0), z_dir=(0, 1, 0))):
        with Locations(Location((-53.000000000000014, -122.75000000000003, 0), (0, 0, 270))):
            Circle(SKETCH22_R)
        with Locations(Location((53.000000000000014, -121.25000000000003, 0), (0, 0, 270))):
            Circle(SKETCH22_R_2)
        with Locations(Location((53.000000000000014, -124.25000000000003, 0), (0, 0, 270))):
            Circle(SKETCH22_R_2)
        with Locations(Location((48.000000000000014, -122.75000000000003, 0), (0, 0, 270))):
            Circle(SKETCH22_R_3)
    extrude(amount=-CUT_EXTRUDE12_DEPTH, mode=Mode.SUBTRACT)


with BuildPart() as cut_extrude6_piece_2:
    # of the separate pieces the step leaves, piece 2, a body of its own (cut_extrude6_pieces)
    add(part_1.part.solids().sort_by_distance((-78, 2, -32.75))[0])

    # Sketch18 → Cut-Extrude7 (cut)
    with BuildSketch(Plane.XZ.offset(-99.99999999999999)):
        Rectangle(SKETCH18_W, SKETCH18_H)
    extrude(amount=CUT_EXTRUDE7_DEPTH, mode=Mode.SUBTRACT)


solid = cut_extrude6_piece_1.part
